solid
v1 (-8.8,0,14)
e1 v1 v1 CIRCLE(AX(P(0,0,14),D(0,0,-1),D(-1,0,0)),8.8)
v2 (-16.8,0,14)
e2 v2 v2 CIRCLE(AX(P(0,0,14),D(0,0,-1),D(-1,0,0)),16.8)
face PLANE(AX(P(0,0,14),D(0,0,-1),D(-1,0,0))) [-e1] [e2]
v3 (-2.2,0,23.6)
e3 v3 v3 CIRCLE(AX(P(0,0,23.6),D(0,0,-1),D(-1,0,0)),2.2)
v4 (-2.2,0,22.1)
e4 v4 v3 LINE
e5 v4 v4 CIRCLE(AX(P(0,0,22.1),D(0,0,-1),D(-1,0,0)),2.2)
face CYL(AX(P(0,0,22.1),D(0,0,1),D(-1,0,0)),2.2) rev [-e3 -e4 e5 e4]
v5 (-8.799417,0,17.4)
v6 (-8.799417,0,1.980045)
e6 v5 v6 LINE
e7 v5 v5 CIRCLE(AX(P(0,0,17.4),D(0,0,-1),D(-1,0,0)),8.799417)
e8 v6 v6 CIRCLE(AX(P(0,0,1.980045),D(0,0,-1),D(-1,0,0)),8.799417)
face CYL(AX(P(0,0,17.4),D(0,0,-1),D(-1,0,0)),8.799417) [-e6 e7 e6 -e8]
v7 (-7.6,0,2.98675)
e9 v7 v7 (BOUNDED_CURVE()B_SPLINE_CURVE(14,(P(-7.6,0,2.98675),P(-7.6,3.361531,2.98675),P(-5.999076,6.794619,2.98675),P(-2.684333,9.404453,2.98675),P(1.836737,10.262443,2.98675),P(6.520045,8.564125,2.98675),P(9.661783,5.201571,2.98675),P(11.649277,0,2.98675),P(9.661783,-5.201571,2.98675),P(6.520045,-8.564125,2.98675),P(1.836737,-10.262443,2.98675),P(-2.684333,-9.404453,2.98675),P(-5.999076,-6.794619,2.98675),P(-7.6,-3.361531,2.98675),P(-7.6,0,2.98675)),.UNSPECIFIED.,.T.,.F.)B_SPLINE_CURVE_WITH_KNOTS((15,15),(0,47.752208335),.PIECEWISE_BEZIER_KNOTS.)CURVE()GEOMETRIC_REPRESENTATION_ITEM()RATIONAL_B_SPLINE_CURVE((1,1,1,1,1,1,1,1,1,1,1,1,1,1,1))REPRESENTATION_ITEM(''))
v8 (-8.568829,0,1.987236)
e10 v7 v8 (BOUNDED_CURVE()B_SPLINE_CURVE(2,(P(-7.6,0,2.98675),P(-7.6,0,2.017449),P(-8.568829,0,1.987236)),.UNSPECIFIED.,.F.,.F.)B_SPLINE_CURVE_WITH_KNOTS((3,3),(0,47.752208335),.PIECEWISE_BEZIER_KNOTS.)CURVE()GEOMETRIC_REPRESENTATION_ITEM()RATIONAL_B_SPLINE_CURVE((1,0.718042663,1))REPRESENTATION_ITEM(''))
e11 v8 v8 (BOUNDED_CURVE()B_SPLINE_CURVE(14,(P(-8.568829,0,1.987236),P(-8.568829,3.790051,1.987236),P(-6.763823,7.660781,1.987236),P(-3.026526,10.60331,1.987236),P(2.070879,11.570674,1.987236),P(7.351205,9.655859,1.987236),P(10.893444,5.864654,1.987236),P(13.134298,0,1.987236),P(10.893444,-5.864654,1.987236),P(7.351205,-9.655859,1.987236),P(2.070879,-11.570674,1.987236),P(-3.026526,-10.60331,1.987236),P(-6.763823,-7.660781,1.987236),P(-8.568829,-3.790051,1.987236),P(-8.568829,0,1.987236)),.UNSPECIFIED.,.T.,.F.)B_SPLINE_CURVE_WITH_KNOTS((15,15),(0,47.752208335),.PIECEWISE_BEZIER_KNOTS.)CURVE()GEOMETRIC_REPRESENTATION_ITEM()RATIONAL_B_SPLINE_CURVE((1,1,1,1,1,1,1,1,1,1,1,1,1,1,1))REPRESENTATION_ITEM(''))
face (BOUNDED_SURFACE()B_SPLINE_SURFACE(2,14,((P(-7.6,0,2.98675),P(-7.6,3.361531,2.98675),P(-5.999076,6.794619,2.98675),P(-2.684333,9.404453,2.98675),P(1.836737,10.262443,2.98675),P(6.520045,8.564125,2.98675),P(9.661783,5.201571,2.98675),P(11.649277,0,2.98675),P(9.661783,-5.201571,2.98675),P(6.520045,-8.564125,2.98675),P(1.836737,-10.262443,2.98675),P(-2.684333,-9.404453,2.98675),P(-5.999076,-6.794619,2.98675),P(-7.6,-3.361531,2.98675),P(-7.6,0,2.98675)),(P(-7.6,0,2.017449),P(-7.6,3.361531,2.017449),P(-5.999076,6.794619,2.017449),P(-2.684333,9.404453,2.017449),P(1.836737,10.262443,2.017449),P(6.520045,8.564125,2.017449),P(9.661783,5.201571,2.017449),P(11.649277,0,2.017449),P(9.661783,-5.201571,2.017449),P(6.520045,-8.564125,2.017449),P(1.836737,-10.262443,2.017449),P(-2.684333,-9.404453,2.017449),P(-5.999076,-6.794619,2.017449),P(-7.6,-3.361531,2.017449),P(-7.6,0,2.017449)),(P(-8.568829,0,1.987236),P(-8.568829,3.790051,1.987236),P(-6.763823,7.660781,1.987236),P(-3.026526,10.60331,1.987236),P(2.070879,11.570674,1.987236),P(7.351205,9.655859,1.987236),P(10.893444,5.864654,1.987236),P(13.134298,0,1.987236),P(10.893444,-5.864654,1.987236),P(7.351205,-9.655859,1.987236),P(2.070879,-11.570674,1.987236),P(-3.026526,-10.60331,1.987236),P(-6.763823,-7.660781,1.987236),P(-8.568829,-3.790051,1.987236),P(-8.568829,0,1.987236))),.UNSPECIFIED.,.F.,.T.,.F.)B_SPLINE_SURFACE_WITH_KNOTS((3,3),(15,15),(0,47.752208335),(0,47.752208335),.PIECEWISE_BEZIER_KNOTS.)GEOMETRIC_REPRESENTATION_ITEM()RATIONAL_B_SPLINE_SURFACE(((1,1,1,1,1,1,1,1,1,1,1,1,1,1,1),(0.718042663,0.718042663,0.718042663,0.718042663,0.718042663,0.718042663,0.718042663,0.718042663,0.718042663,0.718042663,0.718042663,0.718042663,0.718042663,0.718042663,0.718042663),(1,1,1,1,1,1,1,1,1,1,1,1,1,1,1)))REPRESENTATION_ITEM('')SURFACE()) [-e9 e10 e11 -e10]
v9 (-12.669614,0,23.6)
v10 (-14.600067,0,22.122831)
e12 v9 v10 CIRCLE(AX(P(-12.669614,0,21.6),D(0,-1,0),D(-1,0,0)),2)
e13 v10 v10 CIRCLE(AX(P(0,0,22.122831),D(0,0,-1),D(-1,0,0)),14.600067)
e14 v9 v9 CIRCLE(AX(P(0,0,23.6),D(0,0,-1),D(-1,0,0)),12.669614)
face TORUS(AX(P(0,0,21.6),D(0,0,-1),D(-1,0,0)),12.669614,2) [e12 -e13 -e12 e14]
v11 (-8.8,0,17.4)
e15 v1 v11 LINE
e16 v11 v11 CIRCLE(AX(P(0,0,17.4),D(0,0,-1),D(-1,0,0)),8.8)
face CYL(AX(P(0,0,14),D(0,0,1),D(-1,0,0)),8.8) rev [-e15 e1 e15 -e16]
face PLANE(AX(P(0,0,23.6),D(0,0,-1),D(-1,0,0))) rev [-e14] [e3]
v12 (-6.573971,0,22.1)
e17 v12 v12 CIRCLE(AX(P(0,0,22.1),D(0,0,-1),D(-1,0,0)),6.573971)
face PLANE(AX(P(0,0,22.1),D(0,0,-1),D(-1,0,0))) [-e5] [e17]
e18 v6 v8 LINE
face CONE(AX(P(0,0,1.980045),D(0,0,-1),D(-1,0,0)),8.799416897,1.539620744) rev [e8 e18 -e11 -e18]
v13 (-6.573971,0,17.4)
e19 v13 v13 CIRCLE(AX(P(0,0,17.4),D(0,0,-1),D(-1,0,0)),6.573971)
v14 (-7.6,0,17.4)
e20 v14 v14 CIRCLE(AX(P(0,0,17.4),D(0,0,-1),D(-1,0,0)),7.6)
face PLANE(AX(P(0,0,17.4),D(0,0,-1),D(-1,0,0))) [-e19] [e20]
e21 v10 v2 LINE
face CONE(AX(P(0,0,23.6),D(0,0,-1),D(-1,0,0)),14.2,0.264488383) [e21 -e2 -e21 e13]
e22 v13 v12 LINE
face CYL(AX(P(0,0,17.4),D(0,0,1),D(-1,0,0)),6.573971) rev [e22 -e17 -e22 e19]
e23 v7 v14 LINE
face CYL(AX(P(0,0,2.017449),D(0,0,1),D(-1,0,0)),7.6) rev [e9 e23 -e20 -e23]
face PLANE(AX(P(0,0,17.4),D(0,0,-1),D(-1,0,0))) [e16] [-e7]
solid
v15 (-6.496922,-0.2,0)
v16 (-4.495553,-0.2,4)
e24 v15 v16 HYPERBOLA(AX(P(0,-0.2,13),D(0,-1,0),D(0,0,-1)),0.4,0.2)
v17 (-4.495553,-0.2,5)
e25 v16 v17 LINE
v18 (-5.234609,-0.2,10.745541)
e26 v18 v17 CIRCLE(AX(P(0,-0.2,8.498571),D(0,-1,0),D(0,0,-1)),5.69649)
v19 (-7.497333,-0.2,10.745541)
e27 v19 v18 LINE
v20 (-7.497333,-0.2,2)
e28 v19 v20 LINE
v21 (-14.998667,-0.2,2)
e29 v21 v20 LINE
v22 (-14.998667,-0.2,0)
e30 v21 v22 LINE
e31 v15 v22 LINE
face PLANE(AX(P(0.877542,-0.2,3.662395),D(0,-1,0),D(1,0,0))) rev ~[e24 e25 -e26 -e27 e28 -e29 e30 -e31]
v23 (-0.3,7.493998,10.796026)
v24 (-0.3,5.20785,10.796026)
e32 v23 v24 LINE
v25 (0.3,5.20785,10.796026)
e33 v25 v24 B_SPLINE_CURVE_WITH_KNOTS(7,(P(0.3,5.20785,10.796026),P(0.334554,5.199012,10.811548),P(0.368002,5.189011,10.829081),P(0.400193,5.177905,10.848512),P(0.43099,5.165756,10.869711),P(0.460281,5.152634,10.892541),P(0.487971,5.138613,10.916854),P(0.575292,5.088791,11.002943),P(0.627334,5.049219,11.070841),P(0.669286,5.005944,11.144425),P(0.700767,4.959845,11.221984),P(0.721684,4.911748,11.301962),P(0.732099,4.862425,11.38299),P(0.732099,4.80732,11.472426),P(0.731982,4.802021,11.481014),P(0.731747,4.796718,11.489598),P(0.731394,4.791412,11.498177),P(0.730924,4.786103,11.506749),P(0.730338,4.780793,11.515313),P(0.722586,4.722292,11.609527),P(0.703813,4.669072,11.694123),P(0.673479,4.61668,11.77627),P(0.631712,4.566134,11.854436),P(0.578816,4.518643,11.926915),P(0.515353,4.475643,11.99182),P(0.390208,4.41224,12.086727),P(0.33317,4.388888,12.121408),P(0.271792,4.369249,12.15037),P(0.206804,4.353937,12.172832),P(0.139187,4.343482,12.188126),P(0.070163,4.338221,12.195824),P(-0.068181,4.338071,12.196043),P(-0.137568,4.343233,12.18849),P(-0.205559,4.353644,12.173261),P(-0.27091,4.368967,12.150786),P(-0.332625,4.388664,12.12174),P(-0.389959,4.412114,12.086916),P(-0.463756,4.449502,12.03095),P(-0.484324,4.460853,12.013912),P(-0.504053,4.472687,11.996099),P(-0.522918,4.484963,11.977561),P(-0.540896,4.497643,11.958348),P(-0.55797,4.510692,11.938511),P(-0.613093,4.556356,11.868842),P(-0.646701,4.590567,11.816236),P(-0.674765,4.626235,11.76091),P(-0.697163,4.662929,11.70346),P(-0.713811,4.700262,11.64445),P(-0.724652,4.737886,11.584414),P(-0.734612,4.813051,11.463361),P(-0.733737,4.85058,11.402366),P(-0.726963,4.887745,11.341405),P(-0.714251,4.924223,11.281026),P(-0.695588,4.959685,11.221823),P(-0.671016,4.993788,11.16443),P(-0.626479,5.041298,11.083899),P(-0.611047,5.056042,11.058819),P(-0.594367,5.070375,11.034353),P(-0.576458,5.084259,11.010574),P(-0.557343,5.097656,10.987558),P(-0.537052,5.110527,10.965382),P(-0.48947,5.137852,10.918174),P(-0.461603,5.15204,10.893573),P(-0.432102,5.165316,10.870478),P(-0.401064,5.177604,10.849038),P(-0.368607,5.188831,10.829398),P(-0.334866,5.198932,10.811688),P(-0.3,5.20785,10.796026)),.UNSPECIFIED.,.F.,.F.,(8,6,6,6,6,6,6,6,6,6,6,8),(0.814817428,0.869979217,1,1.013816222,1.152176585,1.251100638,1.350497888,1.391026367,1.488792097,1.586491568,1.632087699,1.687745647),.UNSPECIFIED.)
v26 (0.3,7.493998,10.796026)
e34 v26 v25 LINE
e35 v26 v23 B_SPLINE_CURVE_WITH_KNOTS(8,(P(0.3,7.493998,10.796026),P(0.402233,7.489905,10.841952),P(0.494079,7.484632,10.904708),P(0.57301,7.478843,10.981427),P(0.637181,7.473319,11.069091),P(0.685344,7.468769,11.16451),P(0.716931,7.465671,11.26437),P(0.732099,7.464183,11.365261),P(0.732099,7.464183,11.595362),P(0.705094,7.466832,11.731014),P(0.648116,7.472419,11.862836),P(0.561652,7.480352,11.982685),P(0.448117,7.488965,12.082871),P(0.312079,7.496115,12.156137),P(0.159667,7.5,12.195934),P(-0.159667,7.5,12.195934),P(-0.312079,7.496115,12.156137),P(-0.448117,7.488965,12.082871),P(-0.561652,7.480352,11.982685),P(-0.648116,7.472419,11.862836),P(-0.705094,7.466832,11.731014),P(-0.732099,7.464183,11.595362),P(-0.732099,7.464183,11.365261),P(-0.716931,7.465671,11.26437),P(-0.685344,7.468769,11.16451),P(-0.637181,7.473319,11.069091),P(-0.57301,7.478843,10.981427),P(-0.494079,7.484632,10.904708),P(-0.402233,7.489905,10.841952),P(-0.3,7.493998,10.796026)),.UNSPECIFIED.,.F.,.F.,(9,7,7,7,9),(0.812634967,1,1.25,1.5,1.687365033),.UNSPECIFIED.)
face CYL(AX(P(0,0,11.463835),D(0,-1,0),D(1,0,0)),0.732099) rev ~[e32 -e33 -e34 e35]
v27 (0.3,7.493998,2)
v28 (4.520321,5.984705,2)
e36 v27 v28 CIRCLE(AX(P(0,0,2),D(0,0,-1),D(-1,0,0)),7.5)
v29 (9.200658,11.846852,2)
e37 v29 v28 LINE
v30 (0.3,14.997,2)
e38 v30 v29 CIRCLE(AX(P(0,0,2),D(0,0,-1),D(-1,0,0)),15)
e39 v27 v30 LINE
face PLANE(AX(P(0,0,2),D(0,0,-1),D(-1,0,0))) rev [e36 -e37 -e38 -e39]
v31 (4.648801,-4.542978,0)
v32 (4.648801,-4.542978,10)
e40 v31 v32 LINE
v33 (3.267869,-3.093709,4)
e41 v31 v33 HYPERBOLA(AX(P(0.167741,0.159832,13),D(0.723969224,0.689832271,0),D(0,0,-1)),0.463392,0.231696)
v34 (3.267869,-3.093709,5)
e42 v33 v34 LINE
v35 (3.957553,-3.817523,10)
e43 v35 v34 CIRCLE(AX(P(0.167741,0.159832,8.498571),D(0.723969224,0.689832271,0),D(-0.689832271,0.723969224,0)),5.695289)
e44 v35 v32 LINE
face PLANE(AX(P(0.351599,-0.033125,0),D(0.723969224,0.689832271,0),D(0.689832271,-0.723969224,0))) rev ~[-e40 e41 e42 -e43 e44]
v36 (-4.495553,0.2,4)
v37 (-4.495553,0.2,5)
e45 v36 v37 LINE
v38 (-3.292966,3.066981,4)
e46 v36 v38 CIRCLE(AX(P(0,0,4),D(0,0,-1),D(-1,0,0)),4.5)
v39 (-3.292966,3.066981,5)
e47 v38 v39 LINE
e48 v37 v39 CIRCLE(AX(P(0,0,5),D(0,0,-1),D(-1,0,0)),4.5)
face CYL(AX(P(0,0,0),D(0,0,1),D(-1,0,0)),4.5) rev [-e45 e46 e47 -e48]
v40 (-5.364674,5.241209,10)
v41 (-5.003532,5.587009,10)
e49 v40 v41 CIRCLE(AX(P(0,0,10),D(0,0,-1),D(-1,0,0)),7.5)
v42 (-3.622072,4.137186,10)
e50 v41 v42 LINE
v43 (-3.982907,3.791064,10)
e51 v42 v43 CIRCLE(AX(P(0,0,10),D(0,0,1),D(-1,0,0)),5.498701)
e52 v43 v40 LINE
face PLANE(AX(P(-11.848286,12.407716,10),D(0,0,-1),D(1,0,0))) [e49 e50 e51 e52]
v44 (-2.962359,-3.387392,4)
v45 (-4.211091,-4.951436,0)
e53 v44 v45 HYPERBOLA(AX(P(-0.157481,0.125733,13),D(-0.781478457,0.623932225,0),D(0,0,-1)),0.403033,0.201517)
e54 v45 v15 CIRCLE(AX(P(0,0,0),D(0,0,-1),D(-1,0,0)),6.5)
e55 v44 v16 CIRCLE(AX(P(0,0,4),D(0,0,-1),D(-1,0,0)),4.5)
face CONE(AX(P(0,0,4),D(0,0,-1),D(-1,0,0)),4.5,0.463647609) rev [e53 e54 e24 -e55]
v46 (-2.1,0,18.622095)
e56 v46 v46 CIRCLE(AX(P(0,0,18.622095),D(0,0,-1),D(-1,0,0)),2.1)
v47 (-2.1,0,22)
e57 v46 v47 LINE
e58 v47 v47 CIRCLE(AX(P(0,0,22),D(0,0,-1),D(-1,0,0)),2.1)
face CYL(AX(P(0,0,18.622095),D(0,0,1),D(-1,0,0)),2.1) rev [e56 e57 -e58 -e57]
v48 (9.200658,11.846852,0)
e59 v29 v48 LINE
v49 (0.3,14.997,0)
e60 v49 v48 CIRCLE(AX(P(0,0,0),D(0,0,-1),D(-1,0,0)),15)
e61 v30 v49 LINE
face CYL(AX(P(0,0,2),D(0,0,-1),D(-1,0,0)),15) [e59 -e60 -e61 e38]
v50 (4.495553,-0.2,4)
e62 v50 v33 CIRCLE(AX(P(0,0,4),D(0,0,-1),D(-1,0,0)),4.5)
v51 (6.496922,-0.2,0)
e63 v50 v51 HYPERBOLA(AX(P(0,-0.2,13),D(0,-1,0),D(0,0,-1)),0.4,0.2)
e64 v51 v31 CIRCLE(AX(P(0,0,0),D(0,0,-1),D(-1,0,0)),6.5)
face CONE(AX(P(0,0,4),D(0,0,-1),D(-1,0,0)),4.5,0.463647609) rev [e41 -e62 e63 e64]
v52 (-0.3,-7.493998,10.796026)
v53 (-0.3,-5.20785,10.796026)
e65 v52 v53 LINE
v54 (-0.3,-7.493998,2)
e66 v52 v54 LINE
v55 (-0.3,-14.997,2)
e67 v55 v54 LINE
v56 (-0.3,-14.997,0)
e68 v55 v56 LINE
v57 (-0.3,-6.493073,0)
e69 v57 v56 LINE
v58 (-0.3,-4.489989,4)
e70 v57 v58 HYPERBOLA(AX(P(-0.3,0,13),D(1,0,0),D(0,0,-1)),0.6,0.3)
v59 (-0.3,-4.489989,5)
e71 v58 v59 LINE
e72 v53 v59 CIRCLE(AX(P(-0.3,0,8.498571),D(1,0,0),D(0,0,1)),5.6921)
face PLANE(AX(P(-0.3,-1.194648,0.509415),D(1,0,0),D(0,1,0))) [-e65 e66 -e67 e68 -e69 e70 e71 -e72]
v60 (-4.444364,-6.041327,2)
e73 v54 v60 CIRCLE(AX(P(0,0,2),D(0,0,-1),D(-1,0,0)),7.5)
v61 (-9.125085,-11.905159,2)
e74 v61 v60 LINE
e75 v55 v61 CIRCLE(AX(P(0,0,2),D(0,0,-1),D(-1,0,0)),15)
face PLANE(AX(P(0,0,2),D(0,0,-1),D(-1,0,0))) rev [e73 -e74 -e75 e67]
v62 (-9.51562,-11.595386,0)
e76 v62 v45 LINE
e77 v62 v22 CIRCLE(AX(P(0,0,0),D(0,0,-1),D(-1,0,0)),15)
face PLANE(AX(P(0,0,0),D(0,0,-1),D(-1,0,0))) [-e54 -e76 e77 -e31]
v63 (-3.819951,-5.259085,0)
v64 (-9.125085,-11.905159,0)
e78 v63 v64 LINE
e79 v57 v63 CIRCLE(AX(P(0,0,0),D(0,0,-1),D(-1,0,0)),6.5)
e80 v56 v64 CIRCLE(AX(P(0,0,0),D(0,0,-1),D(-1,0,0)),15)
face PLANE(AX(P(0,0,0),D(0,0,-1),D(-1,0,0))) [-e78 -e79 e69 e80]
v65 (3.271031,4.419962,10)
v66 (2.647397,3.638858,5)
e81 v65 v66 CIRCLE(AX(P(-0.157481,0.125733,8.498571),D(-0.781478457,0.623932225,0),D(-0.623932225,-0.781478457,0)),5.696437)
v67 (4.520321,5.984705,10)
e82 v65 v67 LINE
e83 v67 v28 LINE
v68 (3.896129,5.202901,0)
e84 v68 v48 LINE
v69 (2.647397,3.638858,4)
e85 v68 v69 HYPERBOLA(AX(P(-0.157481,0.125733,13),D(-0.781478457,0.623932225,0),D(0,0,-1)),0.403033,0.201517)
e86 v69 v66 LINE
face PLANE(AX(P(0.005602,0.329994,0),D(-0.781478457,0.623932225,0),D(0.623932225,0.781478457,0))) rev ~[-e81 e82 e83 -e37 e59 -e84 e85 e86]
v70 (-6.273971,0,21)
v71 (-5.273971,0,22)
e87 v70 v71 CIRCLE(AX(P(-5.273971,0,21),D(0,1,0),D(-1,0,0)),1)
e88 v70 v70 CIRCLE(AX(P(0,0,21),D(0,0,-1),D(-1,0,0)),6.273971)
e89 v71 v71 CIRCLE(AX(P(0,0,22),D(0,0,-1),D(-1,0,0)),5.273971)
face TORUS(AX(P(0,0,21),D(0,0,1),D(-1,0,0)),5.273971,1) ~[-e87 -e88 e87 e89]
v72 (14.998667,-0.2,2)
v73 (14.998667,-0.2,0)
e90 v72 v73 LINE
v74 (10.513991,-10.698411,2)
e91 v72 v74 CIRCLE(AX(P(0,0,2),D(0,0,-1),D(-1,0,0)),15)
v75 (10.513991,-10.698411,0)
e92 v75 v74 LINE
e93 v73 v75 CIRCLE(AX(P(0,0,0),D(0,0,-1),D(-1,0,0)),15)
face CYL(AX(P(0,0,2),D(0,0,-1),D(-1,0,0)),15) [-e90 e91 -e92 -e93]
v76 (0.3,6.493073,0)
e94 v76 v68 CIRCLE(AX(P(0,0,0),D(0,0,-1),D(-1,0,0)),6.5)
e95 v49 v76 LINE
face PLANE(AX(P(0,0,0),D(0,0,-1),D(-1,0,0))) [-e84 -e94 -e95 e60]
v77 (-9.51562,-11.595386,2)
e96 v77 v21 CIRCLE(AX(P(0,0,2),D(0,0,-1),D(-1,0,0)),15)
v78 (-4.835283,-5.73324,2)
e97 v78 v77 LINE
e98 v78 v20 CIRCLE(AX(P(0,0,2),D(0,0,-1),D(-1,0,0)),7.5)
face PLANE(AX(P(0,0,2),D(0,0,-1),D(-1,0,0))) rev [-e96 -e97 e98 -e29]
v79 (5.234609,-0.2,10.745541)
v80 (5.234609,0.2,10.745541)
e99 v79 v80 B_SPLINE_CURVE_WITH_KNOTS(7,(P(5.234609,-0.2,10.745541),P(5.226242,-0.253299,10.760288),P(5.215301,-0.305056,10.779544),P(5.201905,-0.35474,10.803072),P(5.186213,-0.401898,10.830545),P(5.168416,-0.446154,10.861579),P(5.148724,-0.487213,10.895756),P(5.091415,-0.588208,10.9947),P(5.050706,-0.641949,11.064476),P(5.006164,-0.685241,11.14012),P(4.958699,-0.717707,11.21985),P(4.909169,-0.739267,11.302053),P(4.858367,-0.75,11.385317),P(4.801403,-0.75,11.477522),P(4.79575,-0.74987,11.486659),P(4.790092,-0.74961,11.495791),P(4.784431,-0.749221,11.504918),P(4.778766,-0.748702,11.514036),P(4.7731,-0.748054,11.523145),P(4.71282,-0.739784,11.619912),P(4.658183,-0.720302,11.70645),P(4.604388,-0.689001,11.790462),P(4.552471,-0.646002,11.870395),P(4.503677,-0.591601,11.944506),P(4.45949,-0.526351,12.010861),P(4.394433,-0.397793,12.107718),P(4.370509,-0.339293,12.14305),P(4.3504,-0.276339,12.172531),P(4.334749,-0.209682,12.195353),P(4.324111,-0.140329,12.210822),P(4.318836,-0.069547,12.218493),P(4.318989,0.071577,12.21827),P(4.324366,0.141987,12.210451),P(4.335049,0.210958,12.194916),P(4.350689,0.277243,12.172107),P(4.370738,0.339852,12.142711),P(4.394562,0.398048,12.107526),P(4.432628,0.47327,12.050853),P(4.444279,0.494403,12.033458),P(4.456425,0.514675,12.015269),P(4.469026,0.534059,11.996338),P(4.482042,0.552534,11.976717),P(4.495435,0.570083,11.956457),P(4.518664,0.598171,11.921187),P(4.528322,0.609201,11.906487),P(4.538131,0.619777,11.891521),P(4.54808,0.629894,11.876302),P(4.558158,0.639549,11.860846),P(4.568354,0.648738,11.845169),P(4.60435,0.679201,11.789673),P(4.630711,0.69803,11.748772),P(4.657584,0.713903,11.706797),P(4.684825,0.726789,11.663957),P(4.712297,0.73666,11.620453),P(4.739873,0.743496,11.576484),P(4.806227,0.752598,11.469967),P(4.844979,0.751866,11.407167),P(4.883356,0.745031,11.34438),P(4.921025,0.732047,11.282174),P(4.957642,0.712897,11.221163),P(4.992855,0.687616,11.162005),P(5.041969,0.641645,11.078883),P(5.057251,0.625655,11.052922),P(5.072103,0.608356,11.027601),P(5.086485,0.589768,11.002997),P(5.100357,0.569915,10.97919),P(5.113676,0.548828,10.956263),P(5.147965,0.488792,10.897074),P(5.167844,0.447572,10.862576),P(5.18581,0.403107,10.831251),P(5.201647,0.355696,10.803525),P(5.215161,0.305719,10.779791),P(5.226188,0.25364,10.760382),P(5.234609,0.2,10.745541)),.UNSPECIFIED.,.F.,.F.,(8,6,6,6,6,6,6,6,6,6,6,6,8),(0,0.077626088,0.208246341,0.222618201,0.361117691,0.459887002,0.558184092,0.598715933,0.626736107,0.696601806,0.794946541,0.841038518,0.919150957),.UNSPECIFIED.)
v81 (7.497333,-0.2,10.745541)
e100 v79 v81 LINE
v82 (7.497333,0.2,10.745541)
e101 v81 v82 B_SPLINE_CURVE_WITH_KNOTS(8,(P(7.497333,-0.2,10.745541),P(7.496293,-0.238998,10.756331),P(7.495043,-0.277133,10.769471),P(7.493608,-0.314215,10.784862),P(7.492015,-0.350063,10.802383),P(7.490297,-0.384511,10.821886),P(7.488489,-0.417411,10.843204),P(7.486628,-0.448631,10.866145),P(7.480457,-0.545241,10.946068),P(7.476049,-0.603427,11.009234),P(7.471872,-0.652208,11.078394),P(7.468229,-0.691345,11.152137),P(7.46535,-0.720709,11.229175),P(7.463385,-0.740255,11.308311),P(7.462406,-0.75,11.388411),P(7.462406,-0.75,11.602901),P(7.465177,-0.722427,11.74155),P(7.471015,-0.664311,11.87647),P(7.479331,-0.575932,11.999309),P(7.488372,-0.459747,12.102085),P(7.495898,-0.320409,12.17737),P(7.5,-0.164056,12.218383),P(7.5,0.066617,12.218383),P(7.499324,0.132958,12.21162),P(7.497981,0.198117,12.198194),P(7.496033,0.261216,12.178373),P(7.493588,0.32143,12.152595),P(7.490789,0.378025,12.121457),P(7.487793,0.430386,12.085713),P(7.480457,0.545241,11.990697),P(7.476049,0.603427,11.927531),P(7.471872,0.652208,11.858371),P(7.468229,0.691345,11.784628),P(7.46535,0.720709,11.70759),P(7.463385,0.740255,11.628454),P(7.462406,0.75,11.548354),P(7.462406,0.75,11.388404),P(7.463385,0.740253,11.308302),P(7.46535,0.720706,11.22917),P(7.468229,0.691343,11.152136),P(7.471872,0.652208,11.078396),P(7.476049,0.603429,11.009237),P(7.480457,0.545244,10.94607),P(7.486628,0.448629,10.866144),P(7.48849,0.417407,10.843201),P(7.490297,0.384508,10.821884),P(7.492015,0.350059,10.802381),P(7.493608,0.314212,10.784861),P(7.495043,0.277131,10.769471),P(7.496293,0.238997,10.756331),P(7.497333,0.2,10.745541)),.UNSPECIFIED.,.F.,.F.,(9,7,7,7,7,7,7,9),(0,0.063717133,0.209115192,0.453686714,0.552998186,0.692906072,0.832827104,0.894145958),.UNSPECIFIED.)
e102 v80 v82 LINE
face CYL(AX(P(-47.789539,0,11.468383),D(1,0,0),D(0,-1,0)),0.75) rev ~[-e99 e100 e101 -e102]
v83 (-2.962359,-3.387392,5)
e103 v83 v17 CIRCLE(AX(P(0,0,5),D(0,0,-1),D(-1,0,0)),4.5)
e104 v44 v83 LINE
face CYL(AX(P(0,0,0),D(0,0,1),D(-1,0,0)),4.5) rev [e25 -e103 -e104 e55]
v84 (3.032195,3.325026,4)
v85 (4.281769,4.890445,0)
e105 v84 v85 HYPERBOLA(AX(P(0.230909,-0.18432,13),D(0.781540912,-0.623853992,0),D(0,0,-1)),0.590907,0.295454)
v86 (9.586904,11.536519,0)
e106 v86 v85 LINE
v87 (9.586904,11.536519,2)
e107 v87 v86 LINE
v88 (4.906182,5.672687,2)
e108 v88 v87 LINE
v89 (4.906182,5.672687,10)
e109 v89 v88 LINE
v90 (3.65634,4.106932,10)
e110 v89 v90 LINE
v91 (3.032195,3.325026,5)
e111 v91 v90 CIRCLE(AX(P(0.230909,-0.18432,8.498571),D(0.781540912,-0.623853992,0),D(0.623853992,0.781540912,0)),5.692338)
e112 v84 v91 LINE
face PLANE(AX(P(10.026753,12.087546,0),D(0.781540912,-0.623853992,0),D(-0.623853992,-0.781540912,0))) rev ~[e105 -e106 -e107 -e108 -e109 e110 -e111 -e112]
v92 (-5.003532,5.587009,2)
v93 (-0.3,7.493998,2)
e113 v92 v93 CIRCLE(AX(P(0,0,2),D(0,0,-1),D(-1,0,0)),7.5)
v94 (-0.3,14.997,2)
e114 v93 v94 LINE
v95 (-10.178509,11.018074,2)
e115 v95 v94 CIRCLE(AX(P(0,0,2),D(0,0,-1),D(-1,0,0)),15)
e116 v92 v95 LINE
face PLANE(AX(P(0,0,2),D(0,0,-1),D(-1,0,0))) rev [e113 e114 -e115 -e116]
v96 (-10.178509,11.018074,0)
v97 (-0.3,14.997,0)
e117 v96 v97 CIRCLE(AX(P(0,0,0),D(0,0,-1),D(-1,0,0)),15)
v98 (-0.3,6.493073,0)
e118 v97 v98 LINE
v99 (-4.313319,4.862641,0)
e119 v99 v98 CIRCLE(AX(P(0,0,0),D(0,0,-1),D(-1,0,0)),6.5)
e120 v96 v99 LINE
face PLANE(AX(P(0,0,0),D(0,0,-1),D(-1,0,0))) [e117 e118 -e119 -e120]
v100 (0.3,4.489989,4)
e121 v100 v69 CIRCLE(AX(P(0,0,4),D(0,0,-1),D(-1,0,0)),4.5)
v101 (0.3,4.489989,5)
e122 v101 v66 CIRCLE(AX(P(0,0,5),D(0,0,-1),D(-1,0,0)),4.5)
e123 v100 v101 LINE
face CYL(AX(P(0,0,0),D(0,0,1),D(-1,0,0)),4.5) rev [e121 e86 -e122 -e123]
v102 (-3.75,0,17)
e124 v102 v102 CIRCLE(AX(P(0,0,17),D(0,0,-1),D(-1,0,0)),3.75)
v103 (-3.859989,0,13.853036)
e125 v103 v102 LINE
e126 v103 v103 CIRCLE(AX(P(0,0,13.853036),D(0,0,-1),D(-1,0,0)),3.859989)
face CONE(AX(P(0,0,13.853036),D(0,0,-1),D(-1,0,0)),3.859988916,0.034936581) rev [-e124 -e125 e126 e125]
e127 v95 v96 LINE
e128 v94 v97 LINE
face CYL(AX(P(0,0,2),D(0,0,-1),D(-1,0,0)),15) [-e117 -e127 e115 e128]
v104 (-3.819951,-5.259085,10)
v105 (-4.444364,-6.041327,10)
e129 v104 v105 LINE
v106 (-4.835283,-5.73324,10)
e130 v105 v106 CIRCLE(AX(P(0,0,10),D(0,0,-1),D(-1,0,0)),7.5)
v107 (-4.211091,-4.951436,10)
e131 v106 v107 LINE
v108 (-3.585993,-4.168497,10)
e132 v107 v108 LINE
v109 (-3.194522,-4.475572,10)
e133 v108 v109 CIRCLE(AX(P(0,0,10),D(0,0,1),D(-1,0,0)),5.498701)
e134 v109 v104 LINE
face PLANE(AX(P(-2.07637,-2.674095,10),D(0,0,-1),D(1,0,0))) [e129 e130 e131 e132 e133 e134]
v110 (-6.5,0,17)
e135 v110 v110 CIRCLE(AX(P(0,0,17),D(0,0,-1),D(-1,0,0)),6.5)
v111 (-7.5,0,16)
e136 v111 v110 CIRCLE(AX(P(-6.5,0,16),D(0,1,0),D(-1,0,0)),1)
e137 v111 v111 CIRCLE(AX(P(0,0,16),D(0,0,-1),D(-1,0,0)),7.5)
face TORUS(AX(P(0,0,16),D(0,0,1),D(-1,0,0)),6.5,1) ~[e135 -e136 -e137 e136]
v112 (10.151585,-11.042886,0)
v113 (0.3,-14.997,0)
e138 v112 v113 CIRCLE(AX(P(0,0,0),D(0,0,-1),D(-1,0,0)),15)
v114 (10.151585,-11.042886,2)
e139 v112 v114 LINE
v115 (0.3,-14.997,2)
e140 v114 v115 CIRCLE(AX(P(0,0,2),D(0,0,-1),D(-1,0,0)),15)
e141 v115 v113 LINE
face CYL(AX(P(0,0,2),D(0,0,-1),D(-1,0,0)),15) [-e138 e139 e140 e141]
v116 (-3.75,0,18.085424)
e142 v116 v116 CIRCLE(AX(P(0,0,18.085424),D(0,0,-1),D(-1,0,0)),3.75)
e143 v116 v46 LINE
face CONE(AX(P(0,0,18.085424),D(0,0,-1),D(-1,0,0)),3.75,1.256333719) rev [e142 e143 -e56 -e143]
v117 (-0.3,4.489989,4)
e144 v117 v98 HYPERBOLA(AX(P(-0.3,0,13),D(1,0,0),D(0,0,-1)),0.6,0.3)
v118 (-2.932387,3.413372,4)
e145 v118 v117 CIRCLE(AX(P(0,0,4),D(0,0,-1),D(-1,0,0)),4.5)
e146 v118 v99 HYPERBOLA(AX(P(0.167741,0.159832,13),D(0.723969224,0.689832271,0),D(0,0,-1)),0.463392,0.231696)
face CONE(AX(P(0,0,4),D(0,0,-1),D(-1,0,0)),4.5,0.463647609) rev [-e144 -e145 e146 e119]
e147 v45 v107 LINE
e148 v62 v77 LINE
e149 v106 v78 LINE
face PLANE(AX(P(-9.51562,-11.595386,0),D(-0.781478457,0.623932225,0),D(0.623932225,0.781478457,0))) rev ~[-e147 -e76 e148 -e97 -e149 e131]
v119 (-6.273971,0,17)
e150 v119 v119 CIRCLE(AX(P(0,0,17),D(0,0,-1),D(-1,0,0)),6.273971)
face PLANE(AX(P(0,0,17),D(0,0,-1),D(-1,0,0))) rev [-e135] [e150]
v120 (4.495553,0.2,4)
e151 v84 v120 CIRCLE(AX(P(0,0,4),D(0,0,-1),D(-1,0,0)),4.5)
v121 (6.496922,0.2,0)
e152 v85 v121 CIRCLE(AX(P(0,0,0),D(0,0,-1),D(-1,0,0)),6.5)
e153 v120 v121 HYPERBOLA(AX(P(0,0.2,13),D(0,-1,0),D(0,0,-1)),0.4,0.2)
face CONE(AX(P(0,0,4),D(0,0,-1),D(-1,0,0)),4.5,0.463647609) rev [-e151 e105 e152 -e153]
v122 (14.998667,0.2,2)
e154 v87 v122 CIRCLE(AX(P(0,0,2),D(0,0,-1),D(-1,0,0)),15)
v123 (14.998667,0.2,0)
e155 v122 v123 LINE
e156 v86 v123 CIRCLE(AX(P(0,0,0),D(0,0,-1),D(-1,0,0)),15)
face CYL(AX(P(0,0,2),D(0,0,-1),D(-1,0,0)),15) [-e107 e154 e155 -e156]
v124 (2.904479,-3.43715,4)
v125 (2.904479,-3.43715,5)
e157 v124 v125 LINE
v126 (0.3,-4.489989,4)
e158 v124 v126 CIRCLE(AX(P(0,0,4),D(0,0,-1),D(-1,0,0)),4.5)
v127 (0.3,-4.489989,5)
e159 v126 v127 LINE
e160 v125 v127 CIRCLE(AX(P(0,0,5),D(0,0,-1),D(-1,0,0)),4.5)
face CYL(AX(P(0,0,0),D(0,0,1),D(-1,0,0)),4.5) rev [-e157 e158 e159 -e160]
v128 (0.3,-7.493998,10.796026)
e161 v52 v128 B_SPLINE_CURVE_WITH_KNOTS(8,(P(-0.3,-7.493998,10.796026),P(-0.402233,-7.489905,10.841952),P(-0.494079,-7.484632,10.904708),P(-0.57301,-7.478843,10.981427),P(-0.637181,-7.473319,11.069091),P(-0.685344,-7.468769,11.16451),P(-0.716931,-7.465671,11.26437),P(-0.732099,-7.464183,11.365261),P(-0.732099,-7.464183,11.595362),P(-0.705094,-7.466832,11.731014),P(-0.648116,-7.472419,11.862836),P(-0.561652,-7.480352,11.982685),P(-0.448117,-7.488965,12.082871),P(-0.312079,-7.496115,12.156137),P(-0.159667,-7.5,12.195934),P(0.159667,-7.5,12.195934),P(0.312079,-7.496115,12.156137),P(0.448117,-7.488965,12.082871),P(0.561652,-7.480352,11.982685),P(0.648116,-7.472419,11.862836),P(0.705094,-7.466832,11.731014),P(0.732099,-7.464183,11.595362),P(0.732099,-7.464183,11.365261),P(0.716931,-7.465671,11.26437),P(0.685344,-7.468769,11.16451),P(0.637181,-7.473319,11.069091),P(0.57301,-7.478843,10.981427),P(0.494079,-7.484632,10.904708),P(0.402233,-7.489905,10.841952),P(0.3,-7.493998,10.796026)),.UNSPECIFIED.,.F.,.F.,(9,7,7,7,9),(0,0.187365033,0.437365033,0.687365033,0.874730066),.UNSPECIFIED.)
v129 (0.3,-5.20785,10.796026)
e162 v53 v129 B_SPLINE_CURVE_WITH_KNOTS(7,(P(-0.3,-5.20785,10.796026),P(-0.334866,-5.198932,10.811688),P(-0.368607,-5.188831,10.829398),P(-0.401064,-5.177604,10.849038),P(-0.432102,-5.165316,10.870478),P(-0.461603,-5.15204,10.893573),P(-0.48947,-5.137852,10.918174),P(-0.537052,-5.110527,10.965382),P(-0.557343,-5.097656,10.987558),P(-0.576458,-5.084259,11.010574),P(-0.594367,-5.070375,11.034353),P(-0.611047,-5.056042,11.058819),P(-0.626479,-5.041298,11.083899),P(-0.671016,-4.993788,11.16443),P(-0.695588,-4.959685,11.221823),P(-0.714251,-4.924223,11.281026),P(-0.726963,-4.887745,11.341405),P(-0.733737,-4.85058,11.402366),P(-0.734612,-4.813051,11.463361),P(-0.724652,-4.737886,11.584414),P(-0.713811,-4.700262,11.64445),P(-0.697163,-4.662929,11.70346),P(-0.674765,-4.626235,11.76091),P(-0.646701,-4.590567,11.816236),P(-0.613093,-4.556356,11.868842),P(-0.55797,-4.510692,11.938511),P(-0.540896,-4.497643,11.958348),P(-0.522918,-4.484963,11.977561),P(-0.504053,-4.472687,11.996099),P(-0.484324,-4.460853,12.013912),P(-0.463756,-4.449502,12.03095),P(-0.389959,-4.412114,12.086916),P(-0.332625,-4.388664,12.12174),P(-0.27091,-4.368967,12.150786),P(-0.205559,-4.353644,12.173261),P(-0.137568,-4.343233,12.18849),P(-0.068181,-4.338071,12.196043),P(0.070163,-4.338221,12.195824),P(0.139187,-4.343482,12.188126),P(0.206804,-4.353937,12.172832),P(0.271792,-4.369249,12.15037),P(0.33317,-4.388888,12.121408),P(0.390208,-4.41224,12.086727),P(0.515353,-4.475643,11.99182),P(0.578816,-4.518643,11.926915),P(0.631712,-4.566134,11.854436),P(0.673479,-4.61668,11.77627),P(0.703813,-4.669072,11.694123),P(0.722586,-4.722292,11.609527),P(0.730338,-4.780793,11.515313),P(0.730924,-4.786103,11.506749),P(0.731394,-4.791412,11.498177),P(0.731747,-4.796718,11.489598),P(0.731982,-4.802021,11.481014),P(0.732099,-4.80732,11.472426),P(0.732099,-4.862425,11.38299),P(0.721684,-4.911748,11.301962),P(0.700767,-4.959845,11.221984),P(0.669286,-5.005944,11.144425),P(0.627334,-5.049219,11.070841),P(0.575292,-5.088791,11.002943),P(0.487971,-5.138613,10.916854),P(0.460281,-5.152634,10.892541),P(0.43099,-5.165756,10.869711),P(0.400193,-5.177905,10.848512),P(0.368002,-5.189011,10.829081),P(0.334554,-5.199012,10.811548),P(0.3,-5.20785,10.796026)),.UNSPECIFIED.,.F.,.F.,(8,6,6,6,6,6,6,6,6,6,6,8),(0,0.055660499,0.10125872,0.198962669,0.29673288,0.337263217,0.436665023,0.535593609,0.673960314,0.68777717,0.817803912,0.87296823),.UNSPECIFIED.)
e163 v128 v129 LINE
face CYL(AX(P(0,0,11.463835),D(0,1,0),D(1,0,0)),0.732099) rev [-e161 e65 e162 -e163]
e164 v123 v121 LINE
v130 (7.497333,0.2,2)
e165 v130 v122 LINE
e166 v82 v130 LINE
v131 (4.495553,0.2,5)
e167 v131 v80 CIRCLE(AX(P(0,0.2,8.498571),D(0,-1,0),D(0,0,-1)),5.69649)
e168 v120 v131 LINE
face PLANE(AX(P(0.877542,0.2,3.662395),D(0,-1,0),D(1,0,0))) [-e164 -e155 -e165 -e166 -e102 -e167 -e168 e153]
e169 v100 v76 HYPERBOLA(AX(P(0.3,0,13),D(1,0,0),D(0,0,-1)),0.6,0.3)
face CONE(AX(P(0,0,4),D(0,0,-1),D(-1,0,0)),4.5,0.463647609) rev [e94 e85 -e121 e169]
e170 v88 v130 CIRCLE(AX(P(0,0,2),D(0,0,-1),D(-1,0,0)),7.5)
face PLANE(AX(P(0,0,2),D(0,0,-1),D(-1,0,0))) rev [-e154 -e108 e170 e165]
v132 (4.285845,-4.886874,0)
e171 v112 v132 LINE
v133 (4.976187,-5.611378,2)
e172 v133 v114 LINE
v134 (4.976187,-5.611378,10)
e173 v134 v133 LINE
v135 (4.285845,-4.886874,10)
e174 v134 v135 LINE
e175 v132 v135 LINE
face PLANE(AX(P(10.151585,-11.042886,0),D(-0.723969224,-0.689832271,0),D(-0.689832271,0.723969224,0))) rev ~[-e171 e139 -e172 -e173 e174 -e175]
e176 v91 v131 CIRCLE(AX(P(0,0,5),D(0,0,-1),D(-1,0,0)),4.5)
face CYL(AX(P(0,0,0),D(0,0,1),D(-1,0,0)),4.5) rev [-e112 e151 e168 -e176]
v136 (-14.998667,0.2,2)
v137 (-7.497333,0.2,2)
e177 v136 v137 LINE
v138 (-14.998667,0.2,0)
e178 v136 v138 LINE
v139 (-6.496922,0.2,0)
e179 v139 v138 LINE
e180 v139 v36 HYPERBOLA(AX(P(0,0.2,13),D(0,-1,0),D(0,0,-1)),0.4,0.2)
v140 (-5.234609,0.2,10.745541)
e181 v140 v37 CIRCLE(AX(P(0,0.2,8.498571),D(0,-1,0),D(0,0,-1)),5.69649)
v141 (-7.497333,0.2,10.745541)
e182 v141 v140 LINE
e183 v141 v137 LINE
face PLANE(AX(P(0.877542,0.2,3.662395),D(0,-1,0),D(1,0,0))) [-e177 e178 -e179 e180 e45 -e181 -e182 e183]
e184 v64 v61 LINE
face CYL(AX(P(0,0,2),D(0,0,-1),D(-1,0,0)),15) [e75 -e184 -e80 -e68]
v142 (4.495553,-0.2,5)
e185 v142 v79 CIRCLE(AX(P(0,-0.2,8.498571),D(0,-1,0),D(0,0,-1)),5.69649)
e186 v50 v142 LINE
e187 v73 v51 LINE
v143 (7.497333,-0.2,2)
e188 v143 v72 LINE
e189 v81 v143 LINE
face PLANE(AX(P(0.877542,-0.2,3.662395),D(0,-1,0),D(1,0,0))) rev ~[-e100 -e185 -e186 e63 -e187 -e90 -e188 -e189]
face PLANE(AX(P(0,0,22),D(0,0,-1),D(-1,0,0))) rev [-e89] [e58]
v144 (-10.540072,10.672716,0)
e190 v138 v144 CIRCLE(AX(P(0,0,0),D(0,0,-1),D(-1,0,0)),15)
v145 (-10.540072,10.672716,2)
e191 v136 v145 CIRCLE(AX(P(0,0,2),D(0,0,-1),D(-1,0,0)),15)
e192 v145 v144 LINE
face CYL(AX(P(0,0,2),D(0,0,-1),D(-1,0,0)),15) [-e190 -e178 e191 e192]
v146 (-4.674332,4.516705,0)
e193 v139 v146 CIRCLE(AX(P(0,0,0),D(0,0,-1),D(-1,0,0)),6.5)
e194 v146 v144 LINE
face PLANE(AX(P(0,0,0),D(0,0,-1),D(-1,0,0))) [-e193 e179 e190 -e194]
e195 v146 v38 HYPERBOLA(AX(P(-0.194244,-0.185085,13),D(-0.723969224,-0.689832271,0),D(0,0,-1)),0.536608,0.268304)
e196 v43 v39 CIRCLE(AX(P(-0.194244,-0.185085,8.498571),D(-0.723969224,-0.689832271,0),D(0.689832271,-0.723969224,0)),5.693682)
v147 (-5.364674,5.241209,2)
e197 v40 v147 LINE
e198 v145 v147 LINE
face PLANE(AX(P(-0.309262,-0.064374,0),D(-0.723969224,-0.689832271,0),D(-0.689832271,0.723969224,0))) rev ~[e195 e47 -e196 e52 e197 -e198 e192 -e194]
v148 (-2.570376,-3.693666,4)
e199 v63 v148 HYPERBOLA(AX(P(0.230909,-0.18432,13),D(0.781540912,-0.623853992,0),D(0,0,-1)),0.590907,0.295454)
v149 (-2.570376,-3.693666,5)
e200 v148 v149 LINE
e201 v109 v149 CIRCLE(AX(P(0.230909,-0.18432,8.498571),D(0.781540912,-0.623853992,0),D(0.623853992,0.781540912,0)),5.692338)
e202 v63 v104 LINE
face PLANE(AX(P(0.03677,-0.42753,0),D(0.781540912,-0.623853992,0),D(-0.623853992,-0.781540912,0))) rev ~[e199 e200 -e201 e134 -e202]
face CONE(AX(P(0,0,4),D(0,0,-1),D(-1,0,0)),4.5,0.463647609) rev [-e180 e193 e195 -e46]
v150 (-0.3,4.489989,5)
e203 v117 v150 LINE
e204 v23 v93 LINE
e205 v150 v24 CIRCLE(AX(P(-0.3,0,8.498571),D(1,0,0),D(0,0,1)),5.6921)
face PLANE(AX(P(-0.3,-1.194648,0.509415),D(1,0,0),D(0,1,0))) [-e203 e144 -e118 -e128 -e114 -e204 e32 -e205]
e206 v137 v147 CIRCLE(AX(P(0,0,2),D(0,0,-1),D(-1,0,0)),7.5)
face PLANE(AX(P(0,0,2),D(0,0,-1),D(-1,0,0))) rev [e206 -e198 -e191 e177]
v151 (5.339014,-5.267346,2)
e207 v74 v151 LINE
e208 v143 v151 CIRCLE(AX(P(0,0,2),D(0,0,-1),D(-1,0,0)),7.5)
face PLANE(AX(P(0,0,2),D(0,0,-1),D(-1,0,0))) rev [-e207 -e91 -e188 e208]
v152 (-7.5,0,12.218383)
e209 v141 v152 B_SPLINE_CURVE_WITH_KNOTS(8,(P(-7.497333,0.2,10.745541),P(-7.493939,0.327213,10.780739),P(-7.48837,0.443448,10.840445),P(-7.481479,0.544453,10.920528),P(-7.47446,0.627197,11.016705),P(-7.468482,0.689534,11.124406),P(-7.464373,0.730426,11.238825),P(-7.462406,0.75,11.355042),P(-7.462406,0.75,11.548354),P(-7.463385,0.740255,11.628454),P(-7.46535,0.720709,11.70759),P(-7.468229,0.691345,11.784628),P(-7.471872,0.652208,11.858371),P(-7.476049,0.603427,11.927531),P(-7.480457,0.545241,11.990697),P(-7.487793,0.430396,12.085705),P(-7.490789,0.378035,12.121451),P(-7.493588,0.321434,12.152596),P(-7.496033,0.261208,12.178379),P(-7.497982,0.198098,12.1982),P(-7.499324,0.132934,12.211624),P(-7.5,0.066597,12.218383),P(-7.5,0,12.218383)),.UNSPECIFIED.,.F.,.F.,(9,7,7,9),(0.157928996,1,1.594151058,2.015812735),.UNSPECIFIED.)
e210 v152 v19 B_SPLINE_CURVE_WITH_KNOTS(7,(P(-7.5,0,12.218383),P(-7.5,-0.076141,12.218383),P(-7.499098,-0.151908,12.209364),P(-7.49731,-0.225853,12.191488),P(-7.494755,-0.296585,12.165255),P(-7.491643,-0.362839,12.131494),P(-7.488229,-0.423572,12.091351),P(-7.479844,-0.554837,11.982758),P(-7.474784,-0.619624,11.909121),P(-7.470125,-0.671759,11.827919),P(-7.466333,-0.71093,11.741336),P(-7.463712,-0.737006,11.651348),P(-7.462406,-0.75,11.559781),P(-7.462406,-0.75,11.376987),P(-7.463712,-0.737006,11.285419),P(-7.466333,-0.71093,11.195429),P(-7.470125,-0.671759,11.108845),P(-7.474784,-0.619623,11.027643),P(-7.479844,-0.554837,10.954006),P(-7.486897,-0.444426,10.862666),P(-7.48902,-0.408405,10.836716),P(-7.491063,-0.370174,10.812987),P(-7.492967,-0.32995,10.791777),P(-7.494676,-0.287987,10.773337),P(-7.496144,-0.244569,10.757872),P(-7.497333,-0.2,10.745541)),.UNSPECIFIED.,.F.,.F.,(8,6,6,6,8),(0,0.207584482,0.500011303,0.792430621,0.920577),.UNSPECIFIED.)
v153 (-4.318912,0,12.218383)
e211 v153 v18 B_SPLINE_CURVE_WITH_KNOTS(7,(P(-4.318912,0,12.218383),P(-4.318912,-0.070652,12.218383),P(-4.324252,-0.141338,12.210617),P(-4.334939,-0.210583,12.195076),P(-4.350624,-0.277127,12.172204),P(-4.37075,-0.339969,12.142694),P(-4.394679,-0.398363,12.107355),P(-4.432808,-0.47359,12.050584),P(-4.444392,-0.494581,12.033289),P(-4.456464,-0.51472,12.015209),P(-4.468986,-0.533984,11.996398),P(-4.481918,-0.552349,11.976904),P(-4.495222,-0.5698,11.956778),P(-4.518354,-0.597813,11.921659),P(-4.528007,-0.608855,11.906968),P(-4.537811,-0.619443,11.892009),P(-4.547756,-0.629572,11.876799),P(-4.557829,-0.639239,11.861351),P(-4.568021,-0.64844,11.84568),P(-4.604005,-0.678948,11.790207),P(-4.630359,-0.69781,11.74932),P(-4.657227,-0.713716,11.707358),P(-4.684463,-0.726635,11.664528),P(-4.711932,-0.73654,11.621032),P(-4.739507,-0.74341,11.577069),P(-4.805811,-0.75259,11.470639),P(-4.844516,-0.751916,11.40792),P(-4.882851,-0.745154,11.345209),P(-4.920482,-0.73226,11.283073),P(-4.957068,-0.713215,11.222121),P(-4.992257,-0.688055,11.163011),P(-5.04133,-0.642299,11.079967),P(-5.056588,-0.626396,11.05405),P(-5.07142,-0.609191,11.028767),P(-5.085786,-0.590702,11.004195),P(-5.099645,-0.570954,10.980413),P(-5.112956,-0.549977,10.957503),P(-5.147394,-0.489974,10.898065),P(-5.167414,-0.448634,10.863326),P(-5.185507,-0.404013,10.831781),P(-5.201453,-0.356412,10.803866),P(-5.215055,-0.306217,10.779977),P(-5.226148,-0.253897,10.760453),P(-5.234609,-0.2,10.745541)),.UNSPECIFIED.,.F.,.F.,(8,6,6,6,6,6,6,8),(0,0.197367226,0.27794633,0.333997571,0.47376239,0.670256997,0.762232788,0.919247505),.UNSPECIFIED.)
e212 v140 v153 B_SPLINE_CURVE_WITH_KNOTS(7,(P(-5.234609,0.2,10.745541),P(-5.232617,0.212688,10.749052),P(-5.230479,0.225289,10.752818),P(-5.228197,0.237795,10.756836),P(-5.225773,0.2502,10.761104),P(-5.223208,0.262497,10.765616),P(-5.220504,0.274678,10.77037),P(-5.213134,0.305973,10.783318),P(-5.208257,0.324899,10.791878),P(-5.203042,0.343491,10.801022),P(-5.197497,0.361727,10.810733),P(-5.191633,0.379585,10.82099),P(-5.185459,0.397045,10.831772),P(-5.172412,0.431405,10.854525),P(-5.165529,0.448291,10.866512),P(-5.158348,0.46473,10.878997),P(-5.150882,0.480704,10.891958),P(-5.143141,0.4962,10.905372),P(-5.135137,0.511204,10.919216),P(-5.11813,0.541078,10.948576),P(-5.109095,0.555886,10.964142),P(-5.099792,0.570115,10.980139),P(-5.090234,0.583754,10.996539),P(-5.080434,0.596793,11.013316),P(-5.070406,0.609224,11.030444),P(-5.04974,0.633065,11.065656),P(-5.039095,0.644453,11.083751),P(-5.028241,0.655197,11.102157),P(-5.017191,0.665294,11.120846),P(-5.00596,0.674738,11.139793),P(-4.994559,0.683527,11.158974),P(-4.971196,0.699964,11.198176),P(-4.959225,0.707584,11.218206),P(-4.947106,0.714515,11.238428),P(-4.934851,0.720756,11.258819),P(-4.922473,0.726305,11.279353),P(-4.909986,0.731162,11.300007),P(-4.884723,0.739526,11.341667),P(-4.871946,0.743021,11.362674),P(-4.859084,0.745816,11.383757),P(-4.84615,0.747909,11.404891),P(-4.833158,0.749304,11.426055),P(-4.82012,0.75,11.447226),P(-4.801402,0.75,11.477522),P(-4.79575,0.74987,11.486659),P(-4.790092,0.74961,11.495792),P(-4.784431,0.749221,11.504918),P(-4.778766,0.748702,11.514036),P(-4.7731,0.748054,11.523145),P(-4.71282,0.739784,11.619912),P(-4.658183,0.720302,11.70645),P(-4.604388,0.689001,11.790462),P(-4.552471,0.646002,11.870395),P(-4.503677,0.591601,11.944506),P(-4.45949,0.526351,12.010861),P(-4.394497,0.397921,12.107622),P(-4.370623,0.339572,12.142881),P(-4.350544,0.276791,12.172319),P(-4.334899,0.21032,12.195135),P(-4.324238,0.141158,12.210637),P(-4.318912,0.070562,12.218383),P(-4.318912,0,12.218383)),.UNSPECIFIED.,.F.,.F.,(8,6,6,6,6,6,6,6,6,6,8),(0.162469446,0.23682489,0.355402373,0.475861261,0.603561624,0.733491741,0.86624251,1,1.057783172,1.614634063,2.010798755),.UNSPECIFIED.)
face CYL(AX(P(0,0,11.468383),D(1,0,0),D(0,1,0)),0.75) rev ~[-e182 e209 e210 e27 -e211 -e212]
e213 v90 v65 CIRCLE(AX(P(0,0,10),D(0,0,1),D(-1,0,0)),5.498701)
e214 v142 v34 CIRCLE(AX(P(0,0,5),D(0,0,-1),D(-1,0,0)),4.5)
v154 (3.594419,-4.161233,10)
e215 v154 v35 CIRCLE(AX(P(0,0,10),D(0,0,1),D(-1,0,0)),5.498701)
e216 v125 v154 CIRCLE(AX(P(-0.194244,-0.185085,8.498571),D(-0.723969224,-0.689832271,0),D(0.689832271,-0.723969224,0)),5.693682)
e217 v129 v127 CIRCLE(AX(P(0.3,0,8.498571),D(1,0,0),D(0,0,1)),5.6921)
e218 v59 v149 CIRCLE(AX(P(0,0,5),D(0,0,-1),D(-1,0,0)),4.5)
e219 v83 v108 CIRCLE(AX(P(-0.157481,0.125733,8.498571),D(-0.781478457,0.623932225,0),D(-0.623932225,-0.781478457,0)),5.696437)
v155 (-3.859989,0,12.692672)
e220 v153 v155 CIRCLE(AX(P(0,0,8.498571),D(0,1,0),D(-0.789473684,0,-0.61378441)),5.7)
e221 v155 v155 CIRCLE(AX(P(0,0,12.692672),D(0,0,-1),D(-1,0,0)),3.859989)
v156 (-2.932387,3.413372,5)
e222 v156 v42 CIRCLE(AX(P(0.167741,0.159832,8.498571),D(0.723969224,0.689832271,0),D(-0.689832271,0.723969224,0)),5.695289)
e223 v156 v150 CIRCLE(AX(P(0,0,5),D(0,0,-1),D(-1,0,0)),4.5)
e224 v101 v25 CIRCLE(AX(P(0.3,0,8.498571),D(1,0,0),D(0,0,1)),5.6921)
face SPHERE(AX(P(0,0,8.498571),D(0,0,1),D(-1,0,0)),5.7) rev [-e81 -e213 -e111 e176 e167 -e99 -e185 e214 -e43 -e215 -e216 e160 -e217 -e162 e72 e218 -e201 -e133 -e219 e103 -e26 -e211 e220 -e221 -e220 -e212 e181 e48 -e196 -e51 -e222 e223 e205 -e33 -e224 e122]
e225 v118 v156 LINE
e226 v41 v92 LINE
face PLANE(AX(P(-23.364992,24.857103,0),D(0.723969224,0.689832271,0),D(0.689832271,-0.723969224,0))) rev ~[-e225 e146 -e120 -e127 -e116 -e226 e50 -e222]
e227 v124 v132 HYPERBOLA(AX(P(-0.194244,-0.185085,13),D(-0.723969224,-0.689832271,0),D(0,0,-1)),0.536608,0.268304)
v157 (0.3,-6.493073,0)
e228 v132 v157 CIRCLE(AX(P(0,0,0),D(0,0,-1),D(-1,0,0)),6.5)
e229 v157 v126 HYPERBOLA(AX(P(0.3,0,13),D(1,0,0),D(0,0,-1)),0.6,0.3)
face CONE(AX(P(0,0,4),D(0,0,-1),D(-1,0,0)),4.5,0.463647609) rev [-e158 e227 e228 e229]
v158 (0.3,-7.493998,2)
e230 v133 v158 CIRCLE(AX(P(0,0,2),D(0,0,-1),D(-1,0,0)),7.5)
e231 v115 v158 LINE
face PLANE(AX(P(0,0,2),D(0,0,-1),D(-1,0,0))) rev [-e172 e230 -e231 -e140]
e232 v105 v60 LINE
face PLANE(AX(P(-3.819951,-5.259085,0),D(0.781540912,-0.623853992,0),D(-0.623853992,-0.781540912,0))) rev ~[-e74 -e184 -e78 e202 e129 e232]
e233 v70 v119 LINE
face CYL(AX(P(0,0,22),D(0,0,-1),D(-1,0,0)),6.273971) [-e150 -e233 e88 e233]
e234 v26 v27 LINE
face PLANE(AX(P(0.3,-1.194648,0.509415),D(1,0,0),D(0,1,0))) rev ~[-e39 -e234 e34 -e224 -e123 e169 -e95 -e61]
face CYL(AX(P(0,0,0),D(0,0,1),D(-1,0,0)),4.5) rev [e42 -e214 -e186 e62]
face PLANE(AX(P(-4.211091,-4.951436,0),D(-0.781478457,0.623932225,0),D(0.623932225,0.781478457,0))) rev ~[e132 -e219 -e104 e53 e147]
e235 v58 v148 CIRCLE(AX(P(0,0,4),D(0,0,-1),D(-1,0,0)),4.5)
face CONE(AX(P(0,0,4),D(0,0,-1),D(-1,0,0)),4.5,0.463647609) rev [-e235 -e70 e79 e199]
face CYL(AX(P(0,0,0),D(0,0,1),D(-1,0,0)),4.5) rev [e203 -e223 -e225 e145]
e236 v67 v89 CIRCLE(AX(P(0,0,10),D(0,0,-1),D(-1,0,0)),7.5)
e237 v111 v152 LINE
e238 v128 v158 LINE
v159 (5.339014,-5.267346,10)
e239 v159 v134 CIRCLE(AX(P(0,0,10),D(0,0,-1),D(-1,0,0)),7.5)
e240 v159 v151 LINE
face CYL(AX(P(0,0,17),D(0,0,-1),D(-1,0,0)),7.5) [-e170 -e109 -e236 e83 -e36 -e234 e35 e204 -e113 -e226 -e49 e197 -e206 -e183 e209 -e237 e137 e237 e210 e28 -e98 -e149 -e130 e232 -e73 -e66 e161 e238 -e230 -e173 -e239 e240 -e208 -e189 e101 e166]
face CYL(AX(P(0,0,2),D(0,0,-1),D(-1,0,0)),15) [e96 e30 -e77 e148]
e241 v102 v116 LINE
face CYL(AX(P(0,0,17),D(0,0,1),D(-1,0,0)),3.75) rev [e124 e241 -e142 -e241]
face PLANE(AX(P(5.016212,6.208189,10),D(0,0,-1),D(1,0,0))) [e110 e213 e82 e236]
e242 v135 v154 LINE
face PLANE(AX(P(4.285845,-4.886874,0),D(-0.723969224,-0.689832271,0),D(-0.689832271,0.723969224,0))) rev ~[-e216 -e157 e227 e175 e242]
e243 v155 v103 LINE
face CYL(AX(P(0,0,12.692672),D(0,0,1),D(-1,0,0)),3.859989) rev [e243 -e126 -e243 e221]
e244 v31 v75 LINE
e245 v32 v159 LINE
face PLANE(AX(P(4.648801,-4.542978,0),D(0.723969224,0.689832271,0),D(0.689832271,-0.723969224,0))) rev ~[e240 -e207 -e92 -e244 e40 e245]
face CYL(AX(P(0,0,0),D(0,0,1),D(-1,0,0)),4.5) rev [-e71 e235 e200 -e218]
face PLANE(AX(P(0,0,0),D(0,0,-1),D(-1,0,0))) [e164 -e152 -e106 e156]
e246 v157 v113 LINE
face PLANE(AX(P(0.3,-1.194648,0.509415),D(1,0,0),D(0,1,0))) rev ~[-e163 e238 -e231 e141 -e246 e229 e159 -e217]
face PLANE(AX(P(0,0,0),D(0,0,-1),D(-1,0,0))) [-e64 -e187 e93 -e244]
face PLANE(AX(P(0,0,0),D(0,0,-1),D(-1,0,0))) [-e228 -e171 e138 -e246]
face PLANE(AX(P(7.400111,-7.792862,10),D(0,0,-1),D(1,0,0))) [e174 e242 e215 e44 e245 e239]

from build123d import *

# Parameters (mm, degrees)
F2_SIZE2       = 4
F2_SIZE        = 2
F3_W           = 34.7070610151
F3_H           = 15.6652256846
F4_DEPTH       = 0.2
F4_DEPTH_BACK  = 0.2
F5_R           = 1
F8_R           = 2
F10_D          = 1.5
F10_DEPTH      = 14.9996666074
F11_D          = 1.5
F12_W          = 46.682305634
F12_H          = 21.989823319
F13_DEPTH      = 0.3
F13_DEPTH_BACK = 0.3
F14_R          = 1
F15_R          = 0.732099207
F16_DEPTH      = 25
F16_DEPTH_BACK = 25
F18_DEPTH      = 10


with BuildPart() as f1:
    # F0 (on Front) → F1 (revolve)
    with BuildSketch(Plane.XZ):
        with BuildLine():
            Line((-15, 0), (-4.5, 0))
            Line((-4.5, 0), (-4.5, 5))
            ThreePointArc((-4.5, 5), (-5.6803746274, 8.9711640828), (-3.8599889164, 12.6926724191))
            Line((-3.8599889164, 12.6926724191), (-3.8599889164, 13.85303602))
            Line((-3.8599889164, 13.85303602), (-3.75, 17))
            Line((-3.75, 17), (-3.75, 18.085423857))
            Line((-3.75, 18.085423857), (-2.1, 18.6220947653))
            Line((-2.1, 18.6220947653), (-2.1, 22))
            Line((-2.1, 22), (-6.2739714049, 22))
            Line((-6.2739714049, 22), (-6.2739714049, 17))
            Line((-6.2739714049, 17), (-7.5, 17))
            Line((-7.5, 17), (-7.5, 2))
            Line((-7.5, 2), (-15, 2))
            Line((-15, 2), (-15, 0))
        make_face()
    revolve(axis=Axis((0, 0, -0.9101470151), (0, 0, -1)))

    # F2
    f2_edges = [f1.edges().sort_by_distance(p)[0] for p in [
        (4.5, 0, 0),
    ]]
    chamfer(f2_edges, length=F2_SIZE, length2=F2_SIZE2)

    # F3 (on Front) → F4 (cut, two sides)
    with BuildSketch(Plane.XZ) as f4_sk:
        with Locations((0.8775419556, 3.662395291)):
            Rectangle(F3_W, F3_H)
    extrude(amount=F4_DEPTH, mode=Mode.SUBTRACT)
    extrude(f4_sk.sketch, amount=-F4_DEPTH_BACK, mode=Mode.SUBTRACT)

    # F5
    f5_edges = [f1.edges().sort_by_distance(p)[0] for p in [
        (7.5, 0, 17),
        (6.273971, 0, 22),
    ]]
    fillet(f5_edges, radius=F5_R)

    # F10 (through all, one way)
    with BuildSketch(Plane.YZ):
        with Locations((0, 11.4683825523)):
            Circle(F10_D / 2)
    extrude(amount=-F10_DEPTH, mode=Mode.SUBTRACT)

    # F11 (through all)
    with Locations(Plane(origin=(0, 0, 0), x_dir=(0, 1, 0), z_dir=(-1, 0, 0))):
        with Locations((0, -11.4683825523)):
            Hole(F11_D / 2)

    # F12 (on Right) → F13 (cut, two sides)
    with BuildSketch(Plane.YZ) as f13_sk:
        with Locations((-1.1946484447, 0.5094152875)):
            Rectangle(F12_W, F12_H)
    extrude(amount=F13_DEPTH, mode=Mode.SUBTRACT)
    extrude(f13_sk.sketch, amount=-F13_DEPTH_BACK, mode=Mode.SUBTRACT)

    # F15 (on Front) → F16 (cut, two sides)
    with BuildSketch(Plane.XZ) as f16_sk:
        with Locations((0, 11.4638349041)):
            Circle(F15_R)
    extrude(amount=-F16_DEPTH, mode=Mode.SUBTRACT)
    extrude(f16_sk.sketch, amount=F16_DEPTH_BACK, mode=Mode.SUBTRACT)

    # F17 (on face) → F18 (cut)
    with BuildSketch(Plane(origin=(0, 0, 0), x_dir=(1, 0, 0), z_dir=(0, 0, -1))):
        with BuildLine():
            ThreePointArc((10.5139905017, 10.6984112713), (10.3342231343, 10.872158581), (10.1515849457, 11.0428856324))
            Line((10.1515849457, 11.0428856324), (4.2858445251, 4.8868739196))
            ThreePointArc((4.2858445251, 4.8868739196), (4.4706307589, 4.7184171729), (4.6488011335, 4.5429778803))
            Line((4.6488011335, 4.5429778803), (10.5139905017, 10.6984112713))
        make_face()
        with BuildLine():
            ThreePointArc((4.6488011335, 4.5429778803), (4.4706307589, 4.7184171729), (4.2858445251, 4.8868739196))
            Line((4.2858445251, 4.8868739196), (0.036769962, 0.4275301875))
            Line((0.036769962, 0.4275301875), (0.3515986607, 0.0331245868))
            Line((0.3515986607, 0.0331245868), (4.6488011335, 4.5429778803))
        make_face()
        with BuildLine():
            Line((-0.3092622619, 0.0643742565), (0.036769962, 0.4275301875))
            Line((0.036769962, 0.4275301875), (-3.8199505928, 5.2590852312))
            ThreePointArc((-3.8199505928, 5.2590852312), (-4.0184659824, 5.1090049078), (-4.2110908751, 4.9514355132))
            Line((-4.2110908751, 4.9514355132), (-0.3092622619, 0.0643742565))
        make_face()
        Polygon((0.0056016096, -0.3299944307), (-0.3092622619, 0.0643742565), (-23.7269770598, -24.5121866283), (-23.3649924477, -24.8571027639), align=None)
        Polygon((10.0267531176, -12.0875464992), (0.3515986607, 0.0331245868), (0.0056016096, -0.3299944307), (9.681836982, -12.4495311113), align=None)
        with BuildLine():
            ThreePointArc((-4.2110908751, 4.9514355132), (-4.0184659824, 5.1090049078), (-3.8199505928, 5.2590852312))
            Line((-3.8199505928, 5.2590852312), (-9.1250853215, 11.9051592965))
            ThreePointArc((-9.1250853215, 11.9051592965), (-9.3216393624, 11.7518951492), (-9.5156196617, 11.5953862572))
            Line((-9.5156196617, 11.5953862572), (-4.2110908751, 4.9514355132))
        make_face()
        with BuildLine():
            ThreePointArc((-9.5156196617, 11.5953862572), (-9.3216393624, 11.7518951492), (-9.1250853215, 11.9051592965))
            Line((-9.1250853215, 11.9051592965), (-11.4102009684, 14.7678665817))
            Line((-11.4102009684, 14.7678665817), (-11.7787780998, 14.4300043343))
            Line((-11.7787780998, 14.4300043343), (-9.5156196617, 11.5953862572))
        make_face()
    extrude(amount=-F18_DEPTH, mode=Mode.SUBTRACT)


with BuildPart() as f7:
    # F6 (on Front) → F7 (revolve)
    with BuildSketch(Plane.XZ):
        Polygon((-14.2, 23.6), (-16.8, 14), (-8.8, 14), (-8.8, 17.4), (-8.7994168971, 17.4), (-7.6, 17.4), (-6.5739714049, 17.4), (-6.5739714049, 22.1), (-2.2, 22.1), (-2.2, 23.6), align=None)
        Polygon((-7.6, 17.4), (-8.7994168971, 17.4), (-8.7994168971, 1.9800447152), (-7.6, 2.0174493548), align=None)
    revolve(axis=Axis((0, 0, -0.9101470151), (0, 0, -1)))

    # F8
    f8_edges = [f7.edges().sort_by_distance(p)[0] for p in [
        (14.2, 0, 23.6),
    ]]
    fillet(f8_edges, radius=F8_R)

    # F14
    f14_edges = [f7.edges().sort_by_distance(p)[0] for p in [
        (7.6, 0, 2.017449),
    ]]
    fillet(f14_edges, radius=F14_R)


solid = Compound([f1.part, f7.part])
